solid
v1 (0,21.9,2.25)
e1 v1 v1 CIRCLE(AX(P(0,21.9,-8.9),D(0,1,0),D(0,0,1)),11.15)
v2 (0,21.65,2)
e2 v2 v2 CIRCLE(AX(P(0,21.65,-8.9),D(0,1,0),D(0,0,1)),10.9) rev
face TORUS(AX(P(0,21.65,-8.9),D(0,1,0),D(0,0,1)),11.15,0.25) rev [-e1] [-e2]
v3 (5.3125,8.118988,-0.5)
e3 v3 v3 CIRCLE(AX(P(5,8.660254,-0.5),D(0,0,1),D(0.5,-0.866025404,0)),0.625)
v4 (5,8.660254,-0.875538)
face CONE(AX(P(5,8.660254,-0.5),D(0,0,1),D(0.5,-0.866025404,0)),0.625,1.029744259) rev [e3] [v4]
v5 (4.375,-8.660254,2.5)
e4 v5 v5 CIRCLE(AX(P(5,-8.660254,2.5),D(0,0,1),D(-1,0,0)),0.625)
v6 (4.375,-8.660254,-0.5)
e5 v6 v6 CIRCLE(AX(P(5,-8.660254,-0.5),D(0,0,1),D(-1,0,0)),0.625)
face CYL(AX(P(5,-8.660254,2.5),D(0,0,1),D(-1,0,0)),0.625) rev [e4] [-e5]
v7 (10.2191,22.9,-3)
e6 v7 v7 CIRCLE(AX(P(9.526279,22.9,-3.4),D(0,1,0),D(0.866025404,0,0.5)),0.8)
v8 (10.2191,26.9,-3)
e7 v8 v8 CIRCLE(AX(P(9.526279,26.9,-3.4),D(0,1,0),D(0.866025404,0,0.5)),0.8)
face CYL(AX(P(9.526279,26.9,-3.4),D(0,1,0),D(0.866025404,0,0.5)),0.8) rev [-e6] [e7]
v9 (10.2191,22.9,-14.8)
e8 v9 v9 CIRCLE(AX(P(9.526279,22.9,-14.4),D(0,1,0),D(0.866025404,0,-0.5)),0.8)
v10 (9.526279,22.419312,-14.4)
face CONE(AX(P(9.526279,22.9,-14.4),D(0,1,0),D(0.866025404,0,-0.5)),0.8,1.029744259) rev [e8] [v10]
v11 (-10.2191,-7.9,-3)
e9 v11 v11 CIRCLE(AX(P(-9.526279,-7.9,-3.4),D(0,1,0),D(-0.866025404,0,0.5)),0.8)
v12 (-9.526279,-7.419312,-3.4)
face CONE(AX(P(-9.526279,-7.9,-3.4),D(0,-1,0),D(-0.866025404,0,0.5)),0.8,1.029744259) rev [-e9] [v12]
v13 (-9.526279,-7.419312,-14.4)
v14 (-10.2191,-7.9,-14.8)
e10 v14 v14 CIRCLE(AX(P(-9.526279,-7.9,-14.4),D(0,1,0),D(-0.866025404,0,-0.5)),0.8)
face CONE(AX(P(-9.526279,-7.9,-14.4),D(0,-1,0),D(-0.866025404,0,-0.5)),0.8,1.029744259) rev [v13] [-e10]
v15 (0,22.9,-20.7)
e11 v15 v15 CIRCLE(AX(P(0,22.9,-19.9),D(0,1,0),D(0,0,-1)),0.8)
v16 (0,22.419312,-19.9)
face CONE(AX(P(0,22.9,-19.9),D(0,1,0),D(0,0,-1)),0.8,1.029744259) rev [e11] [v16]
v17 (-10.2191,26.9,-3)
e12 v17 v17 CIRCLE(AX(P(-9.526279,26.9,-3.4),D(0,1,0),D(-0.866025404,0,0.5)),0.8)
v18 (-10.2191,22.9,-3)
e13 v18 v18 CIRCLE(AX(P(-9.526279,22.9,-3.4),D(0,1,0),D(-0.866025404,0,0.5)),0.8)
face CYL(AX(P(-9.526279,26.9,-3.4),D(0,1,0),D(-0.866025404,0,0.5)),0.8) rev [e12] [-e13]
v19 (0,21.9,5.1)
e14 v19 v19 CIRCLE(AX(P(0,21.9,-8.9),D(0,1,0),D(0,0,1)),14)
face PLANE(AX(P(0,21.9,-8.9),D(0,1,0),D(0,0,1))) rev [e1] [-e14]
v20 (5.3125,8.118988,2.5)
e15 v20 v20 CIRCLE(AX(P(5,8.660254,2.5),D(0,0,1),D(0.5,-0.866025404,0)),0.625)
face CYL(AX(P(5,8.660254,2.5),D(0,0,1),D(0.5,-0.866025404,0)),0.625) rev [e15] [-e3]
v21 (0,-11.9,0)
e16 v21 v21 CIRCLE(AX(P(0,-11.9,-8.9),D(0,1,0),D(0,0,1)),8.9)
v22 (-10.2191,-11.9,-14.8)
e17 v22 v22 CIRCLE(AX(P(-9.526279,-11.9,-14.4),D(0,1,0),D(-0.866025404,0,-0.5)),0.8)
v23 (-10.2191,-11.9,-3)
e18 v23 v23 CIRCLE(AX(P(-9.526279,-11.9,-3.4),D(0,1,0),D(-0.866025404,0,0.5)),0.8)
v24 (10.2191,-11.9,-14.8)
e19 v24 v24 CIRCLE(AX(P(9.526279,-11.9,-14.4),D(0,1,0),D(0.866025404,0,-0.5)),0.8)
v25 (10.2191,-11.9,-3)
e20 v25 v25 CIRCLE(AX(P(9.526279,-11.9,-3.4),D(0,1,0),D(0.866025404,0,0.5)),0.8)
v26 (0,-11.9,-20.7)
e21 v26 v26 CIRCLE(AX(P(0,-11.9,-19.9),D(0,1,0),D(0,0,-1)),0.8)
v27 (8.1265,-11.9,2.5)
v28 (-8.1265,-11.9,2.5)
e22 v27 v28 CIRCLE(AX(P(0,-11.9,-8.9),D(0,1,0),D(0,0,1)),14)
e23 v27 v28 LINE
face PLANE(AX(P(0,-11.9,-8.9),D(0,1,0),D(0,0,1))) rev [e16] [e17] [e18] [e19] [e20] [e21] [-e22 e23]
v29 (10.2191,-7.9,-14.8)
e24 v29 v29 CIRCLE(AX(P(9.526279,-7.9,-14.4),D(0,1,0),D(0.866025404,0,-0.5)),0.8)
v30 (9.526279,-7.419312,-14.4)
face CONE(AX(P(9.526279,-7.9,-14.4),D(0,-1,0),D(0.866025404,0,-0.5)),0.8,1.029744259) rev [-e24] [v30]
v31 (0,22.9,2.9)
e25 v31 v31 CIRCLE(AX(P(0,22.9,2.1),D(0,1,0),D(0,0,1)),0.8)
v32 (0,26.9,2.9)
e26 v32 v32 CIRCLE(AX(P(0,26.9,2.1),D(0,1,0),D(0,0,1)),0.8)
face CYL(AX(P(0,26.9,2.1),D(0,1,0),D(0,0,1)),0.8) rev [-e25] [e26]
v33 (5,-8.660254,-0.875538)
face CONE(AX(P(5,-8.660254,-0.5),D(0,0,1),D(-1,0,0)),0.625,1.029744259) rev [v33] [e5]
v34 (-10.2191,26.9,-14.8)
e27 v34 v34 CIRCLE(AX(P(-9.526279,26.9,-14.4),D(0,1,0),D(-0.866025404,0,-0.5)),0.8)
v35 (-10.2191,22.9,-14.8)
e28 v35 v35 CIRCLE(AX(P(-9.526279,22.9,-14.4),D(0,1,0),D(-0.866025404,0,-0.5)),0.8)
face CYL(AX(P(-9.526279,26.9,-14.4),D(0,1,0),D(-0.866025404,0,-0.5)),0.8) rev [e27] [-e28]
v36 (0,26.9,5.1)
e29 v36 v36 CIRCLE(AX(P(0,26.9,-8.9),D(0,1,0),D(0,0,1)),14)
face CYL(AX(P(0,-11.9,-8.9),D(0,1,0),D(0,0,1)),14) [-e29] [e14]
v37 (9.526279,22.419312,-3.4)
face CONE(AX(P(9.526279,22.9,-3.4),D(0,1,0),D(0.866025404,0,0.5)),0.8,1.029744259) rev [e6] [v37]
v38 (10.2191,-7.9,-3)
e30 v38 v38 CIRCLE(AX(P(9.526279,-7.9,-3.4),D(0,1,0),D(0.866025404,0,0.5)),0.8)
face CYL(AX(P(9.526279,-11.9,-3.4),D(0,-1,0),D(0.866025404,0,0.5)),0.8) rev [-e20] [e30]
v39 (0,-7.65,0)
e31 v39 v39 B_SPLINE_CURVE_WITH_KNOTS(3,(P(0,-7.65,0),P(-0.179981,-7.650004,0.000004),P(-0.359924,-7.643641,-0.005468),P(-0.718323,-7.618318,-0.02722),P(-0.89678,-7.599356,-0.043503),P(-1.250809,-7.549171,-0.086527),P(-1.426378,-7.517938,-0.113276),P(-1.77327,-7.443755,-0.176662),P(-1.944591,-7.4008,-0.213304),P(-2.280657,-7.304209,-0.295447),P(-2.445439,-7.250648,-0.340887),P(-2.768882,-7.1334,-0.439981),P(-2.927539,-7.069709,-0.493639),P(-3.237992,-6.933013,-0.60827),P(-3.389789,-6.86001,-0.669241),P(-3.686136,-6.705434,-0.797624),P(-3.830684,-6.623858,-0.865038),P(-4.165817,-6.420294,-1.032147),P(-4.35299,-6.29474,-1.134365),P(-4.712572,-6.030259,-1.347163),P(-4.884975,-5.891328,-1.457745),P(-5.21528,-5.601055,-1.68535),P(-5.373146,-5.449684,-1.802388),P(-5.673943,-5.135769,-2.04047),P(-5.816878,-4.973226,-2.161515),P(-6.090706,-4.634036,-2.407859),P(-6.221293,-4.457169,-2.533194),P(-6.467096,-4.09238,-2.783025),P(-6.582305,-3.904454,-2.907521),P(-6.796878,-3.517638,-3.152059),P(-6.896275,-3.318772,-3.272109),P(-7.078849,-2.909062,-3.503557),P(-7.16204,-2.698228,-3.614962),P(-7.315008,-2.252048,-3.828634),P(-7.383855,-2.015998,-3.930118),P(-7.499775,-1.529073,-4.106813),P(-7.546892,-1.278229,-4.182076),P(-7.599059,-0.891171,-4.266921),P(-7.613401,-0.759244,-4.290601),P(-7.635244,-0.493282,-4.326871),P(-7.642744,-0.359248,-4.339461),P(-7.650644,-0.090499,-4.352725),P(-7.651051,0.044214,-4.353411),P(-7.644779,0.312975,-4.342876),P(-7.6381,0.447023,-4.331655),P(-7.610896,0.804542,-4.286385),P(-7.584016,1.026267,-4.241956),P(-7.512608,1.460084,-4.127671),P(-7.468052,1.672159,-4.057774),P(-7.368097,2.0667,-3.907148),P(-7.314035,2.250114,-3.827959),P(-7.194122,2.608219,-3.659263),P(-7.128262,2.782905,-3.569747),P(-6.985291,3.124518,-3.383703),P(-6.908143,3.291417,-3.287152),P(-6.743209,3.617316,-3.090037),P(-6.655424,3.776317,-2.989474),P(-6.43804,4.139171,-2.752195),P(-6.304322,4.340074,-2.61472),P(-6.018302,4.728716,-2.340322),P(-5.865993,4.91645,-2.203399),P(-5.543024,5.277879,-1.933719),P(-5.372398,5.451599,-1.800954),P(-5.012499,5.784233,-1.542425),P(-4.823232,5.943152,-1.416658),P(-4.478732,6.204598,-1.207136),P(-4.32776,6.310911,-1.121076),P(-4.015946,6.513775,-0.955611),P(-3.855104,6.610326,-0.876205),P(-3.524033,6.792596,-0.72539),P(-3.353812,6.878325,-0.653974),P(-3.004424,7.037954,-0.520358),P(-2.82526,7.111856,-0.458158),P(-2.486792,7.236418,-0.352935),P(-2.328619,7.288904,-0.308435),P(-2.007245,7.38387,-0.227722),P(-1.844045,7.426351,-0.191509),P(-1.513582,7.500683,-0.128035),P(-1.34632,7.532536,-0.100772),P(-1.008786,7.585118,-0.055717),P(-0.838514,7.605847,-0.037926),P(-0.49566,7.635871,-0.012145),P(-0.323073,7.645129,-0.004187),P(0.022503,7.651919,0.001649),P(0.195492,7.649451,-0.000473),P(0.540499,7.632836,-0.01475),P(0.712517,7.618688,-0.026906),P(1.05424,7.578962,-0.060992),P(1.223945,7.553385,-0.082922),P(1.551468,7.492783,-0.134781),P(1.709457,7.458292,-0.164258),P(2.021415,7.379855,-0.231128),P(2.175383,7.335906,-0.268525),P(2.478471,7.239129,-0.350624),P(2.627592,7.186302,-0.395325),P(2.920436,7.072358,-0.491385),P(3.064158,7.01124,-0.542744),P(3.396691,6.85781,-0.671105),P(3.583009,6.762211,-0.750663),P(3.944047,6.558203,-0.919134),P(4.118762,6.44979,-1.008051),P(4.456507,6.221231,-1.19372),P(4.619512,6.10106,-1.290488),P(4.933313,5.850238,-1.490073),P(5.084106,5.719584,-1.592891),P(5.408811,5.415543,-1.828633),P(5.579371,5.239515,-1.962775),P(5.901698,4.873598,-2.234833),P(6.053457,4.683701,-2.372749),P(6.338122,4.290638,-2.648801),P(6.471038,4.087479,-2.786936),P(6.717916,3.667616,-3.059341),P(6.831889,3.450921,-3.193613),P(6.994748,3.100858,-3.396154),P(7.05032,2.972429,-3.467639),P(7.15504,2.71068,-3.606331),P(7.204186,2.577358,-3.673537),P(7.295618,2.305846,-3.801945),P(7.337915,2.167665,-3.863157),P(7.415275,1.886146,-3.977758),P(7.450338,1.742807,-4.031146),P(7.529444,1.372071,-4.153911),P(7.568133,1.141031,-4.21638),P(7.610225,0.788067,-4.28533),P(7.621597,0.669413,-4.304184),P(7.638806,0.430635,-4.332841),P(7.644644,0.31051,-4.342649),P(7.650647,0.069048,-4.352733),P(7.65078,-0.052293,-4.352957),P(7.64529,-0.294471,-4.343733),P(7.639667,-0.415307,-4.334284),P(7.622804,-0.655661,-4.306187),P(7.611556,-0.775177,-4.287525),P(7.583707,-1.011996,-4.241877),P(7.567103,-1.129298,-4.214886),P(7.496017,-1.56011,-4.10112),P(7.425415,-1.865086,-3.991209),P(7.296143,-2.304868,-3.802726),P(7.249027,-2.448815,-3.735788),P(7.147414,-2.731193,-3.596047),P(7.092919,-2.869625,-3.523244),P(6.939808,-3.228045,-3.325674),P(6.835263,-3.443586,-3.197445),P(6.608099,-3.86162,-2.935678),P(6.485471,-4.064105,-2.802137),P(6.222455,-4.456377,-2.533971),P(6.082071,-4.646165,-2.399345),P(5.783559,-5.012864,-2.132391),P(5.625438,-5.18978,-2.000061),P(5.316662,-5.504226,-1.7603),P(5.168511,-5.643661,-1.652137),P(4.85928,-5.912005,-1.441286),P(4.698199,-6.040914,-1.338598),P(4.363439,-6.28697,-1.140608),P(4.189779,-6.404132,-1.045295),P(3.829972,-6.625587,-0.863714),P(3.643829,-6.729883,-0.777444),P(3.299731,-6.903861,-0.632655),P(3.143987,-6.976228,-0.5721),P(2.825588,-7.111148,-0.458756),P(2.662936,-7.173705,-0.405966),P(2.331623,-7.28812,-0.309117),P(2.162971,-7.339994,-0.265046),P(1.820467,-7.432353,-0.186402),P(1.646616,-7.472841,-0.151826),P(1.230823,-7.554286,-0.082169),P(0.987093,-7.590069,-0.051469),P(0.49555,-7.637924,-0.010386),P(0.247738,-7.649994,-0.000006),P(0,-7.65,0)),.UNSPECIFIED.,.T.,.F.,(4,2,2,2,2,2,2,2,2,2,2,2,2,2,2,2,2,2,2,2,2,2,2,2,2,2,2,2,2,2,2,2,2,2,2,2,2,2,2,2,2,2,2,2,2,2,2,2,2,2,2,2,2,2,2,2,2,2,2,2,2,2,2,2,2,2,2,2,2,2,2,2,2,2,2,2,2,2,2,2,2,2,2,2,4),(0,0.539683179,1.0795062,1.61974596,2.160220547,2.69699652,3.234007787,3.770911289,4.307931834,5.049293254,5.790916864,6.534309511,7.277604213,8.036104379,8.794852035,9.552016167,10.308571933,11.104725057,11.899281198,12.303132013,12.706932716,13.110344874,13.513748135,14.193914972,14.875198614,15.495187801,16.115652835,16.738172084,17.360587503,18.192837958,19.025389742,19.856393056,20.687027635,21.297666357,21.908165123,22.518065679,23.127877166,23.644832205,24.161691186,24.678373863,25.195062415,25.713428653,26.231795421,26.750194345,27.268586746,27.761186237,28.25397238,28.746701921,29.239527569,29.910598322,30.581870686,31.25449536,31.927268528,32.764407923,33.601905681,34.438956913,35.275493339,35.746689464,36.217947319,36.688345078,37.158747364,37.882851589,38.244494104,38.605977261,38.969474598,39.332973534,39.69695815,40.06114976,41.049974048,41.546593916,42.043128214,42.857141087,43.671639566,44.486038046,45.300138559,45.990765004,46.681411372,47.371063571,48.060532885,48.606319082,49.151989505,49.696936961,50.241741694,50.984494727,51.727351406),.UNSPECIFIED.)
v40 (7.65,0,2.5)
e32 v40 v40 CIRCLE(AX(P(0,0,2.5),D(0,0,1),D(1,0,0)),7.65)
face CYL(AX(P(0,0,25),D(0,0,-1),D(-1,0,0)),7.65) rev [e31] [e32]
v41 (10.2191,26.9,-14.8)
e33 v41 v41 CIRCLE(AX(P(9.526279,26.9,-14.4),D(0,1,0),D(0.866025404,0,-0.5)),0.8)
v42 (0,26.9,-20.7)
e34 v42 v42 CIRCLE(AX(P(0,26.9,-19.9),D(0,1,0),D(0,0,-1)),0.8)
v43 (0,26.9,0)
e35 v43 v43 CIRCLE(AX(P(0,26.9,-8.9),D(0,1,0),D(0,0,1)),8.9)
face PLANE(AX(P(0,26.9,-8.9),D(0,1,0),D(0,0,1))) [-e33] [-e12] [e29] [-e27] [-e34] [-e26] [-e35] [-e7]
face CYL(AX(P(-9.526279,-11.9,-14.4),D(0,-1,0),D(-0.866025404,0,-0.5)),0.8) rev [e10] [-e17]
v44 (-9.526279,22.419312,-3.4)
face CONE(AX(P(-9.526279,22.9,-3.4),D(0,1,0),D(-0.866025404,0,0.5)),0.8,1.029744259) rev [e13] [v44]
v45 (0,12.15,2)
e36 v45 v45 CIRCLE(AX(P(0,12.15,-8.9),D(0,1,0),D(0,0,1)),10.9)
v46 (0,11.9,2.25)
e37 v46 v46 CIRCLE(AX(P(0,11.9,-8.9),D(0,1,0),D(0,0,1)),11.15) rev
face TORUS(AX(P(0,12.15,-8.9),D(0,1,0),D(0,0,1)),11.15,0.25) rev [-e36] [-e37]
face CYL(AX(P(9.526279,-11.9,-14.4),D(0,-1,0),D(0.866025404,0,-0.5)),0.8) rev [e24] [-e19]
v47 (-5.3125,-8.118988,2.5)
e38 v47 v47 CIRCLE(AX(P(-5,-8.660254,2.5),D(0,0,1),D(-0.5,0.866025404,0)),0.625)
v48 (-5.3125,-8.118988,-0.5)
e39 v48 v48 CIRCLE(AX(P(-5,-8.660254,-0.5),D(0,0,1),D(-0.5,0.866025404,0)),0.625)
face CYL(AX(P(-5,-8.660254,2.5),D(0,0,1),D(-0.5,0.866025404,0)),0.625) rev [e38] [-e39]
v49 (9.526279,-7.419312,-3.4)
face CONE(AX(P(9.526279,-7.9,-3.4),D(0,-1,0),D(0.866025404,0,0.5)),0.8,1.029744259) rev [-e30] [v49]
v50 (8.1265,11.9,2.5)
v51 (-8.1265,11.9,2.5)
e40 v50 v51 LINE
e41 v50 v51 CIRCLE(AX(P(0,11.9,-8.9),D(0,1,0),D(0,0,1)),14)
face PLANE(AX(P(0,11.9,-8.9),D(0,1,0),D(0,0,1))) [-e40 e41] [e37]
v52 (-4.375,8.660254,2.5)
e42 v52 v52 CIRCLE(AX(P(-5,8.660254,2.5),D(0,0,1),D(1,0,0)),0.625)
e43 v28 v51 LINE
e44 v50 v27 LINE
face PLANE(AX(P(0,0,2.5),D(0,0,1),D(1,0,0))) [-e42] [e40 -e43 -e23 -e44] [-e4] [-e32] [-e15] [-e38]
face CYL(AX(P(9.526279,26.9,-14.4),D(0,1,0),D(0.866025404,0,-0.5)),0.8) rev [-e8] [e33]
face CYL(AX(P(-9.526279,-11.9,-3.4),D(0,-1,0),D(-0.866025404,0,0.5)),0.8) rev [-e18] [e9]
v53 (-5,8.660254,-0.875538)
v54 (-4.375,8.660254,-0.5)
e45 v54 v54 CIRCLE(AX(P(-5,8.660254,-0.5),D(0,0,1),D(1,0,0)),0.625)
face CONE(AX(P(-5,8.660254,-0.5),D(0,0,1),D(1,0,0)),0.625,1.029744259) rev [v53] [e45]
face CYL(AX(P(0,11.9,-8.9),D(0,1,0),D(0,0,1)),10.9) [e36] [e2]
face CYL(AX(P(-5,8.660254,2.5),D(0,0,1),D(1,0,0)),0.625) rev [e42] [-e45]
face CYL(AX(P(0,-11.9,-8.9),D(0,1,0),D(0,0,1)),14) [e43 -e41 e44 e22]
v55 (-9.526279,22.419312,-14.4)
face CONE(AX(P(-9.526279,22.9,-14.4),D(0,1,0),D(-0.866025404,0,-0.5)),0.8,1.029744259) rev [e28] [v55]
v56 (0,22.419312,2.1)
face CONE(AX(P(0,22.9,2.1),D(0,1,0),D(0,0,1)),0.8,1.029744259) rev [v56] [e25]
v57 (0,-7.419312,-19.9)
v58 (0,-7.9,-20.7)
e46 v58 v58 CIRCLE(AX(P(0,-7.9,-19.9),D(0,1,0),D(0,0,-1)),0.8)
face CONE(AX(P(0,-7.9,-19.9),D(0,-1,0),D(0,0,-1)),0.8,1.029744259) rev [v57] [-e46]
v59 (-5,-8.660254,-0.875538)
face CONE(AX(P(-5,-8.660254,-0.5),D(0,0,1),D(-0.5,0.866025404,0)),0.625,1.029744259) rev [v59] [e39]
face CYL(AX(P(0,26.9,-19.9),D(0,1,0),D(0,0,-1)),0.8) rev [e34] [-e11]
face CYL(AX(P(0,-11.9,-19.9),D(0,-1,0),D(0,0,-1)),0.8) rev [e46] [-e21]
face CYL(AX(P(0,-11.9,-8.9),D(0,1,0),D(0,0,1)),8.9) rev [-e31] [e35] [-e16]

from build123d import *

# Parameters (mm, degrees)
SKETCH1_R                = 7.15
SKETCH1_R_2              = 6.65
BOSS_EXTRUDE1_DEPTH      = 15
BOSS_EXTRUDE2_DEPTH      = 26.9
BOSS_EXTRUDE2_DEPTH_BACK = 11.9
SKETCH2_R                = 14
SKETCH2_R_2              = 8.9
CUT_EXTRUDE12_START      = -15
SKETCH50_R               = 14
SKETCH50_R_2             = 10.9
CUT_EXTRUDE12_DEPTH      = 10
CUT_EXTRUDE8_DEPTH       = 10
CUT_EXTRUDE8_DEPTH_BACK  = 21.28
SKETCH30_R               = 7.65
CIRPATTERN3_COUNT        = 6
BOSS_EXTRUDE3_REACH      = 49.179
BOSS_EXTRUDE3_END_RADIUS = 7.65
SKETCH39_R               = 0.8
CUT_EXTRUDE11_START      = 2.5
SKETCH38_R               = 11.53
CUT_EXTRUDE11_DEPTH      = 10
CUT_EXTRUDE13_DEPTH      = 39.000263325
CUT_EXTRUDE13_DEPTH_BACK = 39.000263325
SKETCH51_W               = 20.008016057
SKETCH51_H               = 32.534282003
CIRPATTERN4_COUNT        = 6
FILLET1_R                = 0.25


with BuildPart() as part:
    # Sketch1 → Boss-Extrude1 (new body)
    with BuildSketch(Plane.XY):
        Circle(SKETCH1_R)
        Circle(SKETCH1_R_2, mode=Mode.SUBTRACT)
    extrude(amount=BOSS_EXTRUDE1_DEPTH)

    # Sketch2 → Boss-Extrude2 (add, two sides: drawn at the far end of the back side and taken through both)
    with BuildSketch(Plane(origin=(0, 0, 0), x_dir=(1, 0, 0), z_dir=(0, 1, 0)).offset(-BOSS_EXTRUDE2_DEPTH_BACK)):
        with Locations((0, 8.9)):
            Circle(SKETCH2_R)
        with Locations((0, 8.9)):
            Circle(SKETCH2_R_2, mode=Mode.SUBTRACT)
    extrude(amount=BOSS_EXTRUDE2_DEPTH + BOSS_EXTRUDE2_DEPTH_BACK)

    # Sketch50 → Cut-Extrude12 (cut)
    with BuildSketch(Plane(origin=(0, 26.9, 0), x_dir=(1, 0, 0), z_dir=(0, 1, 0)).offset(CUT_EXTRUDE12_START)):
        with Locations((0, 8.9)):
            Circle(SKETCH50_R)
        with Locations((0, 8.9)):
            Circle(SKETCH50_R_2, mode=Mode.SUBTRACT)
    extrude(amount=CUT_EXTRUDE12_DEPTH, mode=Mode.SUBTRACT)

    # Sketch30 → Cut-Extrude8 (cut, two sides: drawn at the far end of the back side and taken through both)
    with BuildSketch(Plane.XY.offset(15).offset(-CUT_EXTRUDE8_DEPTH_BACK)):
        Circle(SKETCH30_R)
    extrude(amount=CUT_EXTRUDE8_DEPTH + CUT_EXTRUDE8_DEPTH_BACK, mode=Mode.SUBTRACT)

    # Sketch47 → Tap Drill for M2 Tap1 (revolve, cut)
    with BuildSketch(Plane(origin=(0, 26.9, 2.1), x_dir=(0, 0, 1), z_dir=(1, 0, 0))):
        Polygon((0, 0), (0, 4.480688495), (0.8, 4), (0.8, 0), align=None)
    tap_drill_for_m2_tap1 = revolve(axis=Axis((0, 33.25, 2.1), (0, -1, 0)), mode=Mode.SUBTRACT)

    # CirPattern3: Tap Drill for M2 Tap1 ×6 about axis
    cirpattern3_axis = Axis((0, -11.9, -8.9), (0, 1, 0))
    for i in range(1, CIRPATTERN3_COUNT):
        add(tap_drill_for_m2_tap1.rotate(cirpattern3_axis, i * 360 / CIRPATTERN3_COUNT), mode=Mode.SUBTRACT)

    # Mirror1 copy 1 sketch → Mirror1 copy 1 (revolve, cut)
    with BuildSketch(Plane(origin=(9.526279442, -11.9, -3.4), x_dir=(0.8660254037844386, 0, 0.5000000000000001), z_dir=(0.5000000000000001, 0, -0.8660254037844386))):
        Polygon((0, 0), (0, -4.480688495), (0.8, -4), (0.8, 0), align=None)
    revolve(axis=Axis((9.526279442, -18.25, -3.4), (0, -1, 0)), mode=Mode.SUBTRACT)

    # Mirror1 copy 2 sketch → Mirror1 copy 2 (revolve, cut)
    with BuildSketch(Plane(origin=(9.526279442, -11.9, -14.4), x_dir=(0.8660254037844387, 0, -0.4999999999999998), z_dir=(-0.4999999999999998, 0, -0.8660254037844387))):
        Polygon((0, 0), (0, -4.480688495), (0.8, -4), (0.8, 0), align=None)
    revolve(axis=Axis((9.526279442, -18.25, -14.4), (0, -1, 0)), mode=Mode.SUBTRACT)

    # Mirror1 copy 3 sketch → Mirror1 copy 3 (revolve, cut)
    with BuildSketch(Plane(origin=(0, -11.9, -19.9), x_dir=(0, 0, -1), z_dir=(-1, 0, 0))):
        Polygon((0, 0), (0, -4.480688495), (0.8, -4), (0.8, 0), align=None)
    revolve(axis=Axis((0, -18.25, -19.9), (0, -1, 0)), mode=Mode.SUBTRACT)

    # Mirror1 copy 4 sketch → Mirror1 copy 4 (revolve, cut)
    with BuildSketch(Plane(origin=(-9.526279442, -11.9, -14.4), x_dir=(-0.8660254037844384, 0, -0.5000000000000004), z_dir=(-0.5000000000000004, 0, 0.8660254037844384))):
        Polygon((0, 0), (0, -4.480688495), (0.8, -4), (0.8, 0), align=None)
    revolve(axis=Axis((-9.526279442, -18.25, -14.4), (0, -1, 0)), mode=Mode.SUBTRACT)

    # Mirror1 copy 5 sketch → Mirror1 copy 5 (revolve, cut)
    with BuildSketch(Plane(origin=(-9.526279442, -11.9, -3.4), x_dir=(-0.8660254037844386, 0, 0.5000000000000001), z_dir=(0.5000000000000001, 0, 0.8660254037844386))):
        Polygon((0, 0), (0, -4.480688495), (0.8, -4), (0.8, 0), align=None)
    revolve(axis=Axis((-9.526279442, -18.25, -3.4), (0, -1, 0)), mode=Mode.SUBTRACT)

    # Mirror1 copy 6 sketch → Mirror1 copy 6 (revolve, cut)
    with BuildSketch(Plane(origin=(0, -11.9, 2.1), x_dir=(0, 0, 1), z_dir=(1, 0, 0))):
        Polygon((0, 0), (0, -4.480688495), (0.8, -4), (0.8, 0), align=None)
    revolve(axis=Axis((0, -18.25, 2.1), (0, -1, 0)), mode=Mode.SUBTRACT)

    # Boss-Extrude3: up to this cylinder (the profile starts outside it)
    boss_extrude3_end = Plane(origin=(0, 0, 2.1), z_dir=(0, 0, -1)) * Cylinder(BOSS_EXTRUDE3_END_RADIUS, 114.658, mode=Mode.PRIVATE)
    # Sketch39 → Boss-Extrude3 (add, up to the surface)
    with BuildSketch(Plane.XZ.offset(11.9), mode=Mode.PRIVATE) as boss_extrude3_sk1:
        with Locations((0, 2.1)):
            Circle(SKETCH39_R)
    boss_extrude3_tool1 = extrude(boss_extrude3_sk1.sketch, amount=-BOSS_EXTRUDE3_REACH, mode=Mode.PRIVATE) - boss_extrude3_end
    add(boss_extrude3_tool1.solids().sort_by_distance((0, -11.9, 2.1))[0])

    # Sketch38 → Cut-Extrude11 (cut)
    with BuildSketch(Plane.XY.offset(CUT_EXTRUDE11_START)):
        Circle(SKETCH38_R)
    extrude(amount=CUT_EXTRUDE11_DEPTH, mode=Mode.SUBTRACT)

    # Sketch51 → Cut-Extrude13 (cut, two sides: drawn at the far end of the back side and taken through both)
    with BuildSketch(Plane(origin=(0, 0, 0), x_dir=(0, 0, -1), z_dir=(1, 0, 0)).offset(-CUT_EXTRUDE13_DEPTH_BACK)):
        with Locations((-12.504008029, -1.384089117)):
            Rectangle(SKETCH51_W, SKETCH51_H)
    extrude(amount=CUT_EXTRUDE13_DEPTH + CUT_EXTRUDE13_DEPTH_BACK, mode=Mode.SUBTRACT)

    # Sketch49 → Tap Drill for M1.6 Tap1 (revolve, cut)
    with BuildSketch(Plane(origin=(-5, 8.660254038, 2.5), x_dir=(0, -1, 0), z_dir=(1, 0, 0))):
        Polygon((0, 0), (0, 3.375537887), (0.625, 3), (0.625, 0), align=None)
    tap_drill_for_m1_6_tap1 = revolve(axis=Axis((-5, 8.660254038, 8.85), (0, 0, -1)), mode=Mode.SUBTRACT)

    # CirPattern4: Tap Drill for M1.6 Tap1 ×6 about axis, 2 skipped
    cirpattern4_axis = Axis((0, 0, 25), (0, 0, 1))
    add([tap_drill_for_m1_6_tap1.rotate(cirpattern4_axis, i * 360 / CIRPATTERN4_COUNT) for i in range(1, CIRPATTERN4_COUNT) if i not in (1, 4)], mode=Mode.SUBTRACT)

    # Fillet1
    fillet1_edges = [part.edges().sort_by_distance(p)[0] for p in [
        (-10.9, 21.9, -8.9),
        (-10.9, 11.9, -8.9),
    ]]
    fillet(fillet1_edges, radius=FILLET1_R)


solid = part.part
